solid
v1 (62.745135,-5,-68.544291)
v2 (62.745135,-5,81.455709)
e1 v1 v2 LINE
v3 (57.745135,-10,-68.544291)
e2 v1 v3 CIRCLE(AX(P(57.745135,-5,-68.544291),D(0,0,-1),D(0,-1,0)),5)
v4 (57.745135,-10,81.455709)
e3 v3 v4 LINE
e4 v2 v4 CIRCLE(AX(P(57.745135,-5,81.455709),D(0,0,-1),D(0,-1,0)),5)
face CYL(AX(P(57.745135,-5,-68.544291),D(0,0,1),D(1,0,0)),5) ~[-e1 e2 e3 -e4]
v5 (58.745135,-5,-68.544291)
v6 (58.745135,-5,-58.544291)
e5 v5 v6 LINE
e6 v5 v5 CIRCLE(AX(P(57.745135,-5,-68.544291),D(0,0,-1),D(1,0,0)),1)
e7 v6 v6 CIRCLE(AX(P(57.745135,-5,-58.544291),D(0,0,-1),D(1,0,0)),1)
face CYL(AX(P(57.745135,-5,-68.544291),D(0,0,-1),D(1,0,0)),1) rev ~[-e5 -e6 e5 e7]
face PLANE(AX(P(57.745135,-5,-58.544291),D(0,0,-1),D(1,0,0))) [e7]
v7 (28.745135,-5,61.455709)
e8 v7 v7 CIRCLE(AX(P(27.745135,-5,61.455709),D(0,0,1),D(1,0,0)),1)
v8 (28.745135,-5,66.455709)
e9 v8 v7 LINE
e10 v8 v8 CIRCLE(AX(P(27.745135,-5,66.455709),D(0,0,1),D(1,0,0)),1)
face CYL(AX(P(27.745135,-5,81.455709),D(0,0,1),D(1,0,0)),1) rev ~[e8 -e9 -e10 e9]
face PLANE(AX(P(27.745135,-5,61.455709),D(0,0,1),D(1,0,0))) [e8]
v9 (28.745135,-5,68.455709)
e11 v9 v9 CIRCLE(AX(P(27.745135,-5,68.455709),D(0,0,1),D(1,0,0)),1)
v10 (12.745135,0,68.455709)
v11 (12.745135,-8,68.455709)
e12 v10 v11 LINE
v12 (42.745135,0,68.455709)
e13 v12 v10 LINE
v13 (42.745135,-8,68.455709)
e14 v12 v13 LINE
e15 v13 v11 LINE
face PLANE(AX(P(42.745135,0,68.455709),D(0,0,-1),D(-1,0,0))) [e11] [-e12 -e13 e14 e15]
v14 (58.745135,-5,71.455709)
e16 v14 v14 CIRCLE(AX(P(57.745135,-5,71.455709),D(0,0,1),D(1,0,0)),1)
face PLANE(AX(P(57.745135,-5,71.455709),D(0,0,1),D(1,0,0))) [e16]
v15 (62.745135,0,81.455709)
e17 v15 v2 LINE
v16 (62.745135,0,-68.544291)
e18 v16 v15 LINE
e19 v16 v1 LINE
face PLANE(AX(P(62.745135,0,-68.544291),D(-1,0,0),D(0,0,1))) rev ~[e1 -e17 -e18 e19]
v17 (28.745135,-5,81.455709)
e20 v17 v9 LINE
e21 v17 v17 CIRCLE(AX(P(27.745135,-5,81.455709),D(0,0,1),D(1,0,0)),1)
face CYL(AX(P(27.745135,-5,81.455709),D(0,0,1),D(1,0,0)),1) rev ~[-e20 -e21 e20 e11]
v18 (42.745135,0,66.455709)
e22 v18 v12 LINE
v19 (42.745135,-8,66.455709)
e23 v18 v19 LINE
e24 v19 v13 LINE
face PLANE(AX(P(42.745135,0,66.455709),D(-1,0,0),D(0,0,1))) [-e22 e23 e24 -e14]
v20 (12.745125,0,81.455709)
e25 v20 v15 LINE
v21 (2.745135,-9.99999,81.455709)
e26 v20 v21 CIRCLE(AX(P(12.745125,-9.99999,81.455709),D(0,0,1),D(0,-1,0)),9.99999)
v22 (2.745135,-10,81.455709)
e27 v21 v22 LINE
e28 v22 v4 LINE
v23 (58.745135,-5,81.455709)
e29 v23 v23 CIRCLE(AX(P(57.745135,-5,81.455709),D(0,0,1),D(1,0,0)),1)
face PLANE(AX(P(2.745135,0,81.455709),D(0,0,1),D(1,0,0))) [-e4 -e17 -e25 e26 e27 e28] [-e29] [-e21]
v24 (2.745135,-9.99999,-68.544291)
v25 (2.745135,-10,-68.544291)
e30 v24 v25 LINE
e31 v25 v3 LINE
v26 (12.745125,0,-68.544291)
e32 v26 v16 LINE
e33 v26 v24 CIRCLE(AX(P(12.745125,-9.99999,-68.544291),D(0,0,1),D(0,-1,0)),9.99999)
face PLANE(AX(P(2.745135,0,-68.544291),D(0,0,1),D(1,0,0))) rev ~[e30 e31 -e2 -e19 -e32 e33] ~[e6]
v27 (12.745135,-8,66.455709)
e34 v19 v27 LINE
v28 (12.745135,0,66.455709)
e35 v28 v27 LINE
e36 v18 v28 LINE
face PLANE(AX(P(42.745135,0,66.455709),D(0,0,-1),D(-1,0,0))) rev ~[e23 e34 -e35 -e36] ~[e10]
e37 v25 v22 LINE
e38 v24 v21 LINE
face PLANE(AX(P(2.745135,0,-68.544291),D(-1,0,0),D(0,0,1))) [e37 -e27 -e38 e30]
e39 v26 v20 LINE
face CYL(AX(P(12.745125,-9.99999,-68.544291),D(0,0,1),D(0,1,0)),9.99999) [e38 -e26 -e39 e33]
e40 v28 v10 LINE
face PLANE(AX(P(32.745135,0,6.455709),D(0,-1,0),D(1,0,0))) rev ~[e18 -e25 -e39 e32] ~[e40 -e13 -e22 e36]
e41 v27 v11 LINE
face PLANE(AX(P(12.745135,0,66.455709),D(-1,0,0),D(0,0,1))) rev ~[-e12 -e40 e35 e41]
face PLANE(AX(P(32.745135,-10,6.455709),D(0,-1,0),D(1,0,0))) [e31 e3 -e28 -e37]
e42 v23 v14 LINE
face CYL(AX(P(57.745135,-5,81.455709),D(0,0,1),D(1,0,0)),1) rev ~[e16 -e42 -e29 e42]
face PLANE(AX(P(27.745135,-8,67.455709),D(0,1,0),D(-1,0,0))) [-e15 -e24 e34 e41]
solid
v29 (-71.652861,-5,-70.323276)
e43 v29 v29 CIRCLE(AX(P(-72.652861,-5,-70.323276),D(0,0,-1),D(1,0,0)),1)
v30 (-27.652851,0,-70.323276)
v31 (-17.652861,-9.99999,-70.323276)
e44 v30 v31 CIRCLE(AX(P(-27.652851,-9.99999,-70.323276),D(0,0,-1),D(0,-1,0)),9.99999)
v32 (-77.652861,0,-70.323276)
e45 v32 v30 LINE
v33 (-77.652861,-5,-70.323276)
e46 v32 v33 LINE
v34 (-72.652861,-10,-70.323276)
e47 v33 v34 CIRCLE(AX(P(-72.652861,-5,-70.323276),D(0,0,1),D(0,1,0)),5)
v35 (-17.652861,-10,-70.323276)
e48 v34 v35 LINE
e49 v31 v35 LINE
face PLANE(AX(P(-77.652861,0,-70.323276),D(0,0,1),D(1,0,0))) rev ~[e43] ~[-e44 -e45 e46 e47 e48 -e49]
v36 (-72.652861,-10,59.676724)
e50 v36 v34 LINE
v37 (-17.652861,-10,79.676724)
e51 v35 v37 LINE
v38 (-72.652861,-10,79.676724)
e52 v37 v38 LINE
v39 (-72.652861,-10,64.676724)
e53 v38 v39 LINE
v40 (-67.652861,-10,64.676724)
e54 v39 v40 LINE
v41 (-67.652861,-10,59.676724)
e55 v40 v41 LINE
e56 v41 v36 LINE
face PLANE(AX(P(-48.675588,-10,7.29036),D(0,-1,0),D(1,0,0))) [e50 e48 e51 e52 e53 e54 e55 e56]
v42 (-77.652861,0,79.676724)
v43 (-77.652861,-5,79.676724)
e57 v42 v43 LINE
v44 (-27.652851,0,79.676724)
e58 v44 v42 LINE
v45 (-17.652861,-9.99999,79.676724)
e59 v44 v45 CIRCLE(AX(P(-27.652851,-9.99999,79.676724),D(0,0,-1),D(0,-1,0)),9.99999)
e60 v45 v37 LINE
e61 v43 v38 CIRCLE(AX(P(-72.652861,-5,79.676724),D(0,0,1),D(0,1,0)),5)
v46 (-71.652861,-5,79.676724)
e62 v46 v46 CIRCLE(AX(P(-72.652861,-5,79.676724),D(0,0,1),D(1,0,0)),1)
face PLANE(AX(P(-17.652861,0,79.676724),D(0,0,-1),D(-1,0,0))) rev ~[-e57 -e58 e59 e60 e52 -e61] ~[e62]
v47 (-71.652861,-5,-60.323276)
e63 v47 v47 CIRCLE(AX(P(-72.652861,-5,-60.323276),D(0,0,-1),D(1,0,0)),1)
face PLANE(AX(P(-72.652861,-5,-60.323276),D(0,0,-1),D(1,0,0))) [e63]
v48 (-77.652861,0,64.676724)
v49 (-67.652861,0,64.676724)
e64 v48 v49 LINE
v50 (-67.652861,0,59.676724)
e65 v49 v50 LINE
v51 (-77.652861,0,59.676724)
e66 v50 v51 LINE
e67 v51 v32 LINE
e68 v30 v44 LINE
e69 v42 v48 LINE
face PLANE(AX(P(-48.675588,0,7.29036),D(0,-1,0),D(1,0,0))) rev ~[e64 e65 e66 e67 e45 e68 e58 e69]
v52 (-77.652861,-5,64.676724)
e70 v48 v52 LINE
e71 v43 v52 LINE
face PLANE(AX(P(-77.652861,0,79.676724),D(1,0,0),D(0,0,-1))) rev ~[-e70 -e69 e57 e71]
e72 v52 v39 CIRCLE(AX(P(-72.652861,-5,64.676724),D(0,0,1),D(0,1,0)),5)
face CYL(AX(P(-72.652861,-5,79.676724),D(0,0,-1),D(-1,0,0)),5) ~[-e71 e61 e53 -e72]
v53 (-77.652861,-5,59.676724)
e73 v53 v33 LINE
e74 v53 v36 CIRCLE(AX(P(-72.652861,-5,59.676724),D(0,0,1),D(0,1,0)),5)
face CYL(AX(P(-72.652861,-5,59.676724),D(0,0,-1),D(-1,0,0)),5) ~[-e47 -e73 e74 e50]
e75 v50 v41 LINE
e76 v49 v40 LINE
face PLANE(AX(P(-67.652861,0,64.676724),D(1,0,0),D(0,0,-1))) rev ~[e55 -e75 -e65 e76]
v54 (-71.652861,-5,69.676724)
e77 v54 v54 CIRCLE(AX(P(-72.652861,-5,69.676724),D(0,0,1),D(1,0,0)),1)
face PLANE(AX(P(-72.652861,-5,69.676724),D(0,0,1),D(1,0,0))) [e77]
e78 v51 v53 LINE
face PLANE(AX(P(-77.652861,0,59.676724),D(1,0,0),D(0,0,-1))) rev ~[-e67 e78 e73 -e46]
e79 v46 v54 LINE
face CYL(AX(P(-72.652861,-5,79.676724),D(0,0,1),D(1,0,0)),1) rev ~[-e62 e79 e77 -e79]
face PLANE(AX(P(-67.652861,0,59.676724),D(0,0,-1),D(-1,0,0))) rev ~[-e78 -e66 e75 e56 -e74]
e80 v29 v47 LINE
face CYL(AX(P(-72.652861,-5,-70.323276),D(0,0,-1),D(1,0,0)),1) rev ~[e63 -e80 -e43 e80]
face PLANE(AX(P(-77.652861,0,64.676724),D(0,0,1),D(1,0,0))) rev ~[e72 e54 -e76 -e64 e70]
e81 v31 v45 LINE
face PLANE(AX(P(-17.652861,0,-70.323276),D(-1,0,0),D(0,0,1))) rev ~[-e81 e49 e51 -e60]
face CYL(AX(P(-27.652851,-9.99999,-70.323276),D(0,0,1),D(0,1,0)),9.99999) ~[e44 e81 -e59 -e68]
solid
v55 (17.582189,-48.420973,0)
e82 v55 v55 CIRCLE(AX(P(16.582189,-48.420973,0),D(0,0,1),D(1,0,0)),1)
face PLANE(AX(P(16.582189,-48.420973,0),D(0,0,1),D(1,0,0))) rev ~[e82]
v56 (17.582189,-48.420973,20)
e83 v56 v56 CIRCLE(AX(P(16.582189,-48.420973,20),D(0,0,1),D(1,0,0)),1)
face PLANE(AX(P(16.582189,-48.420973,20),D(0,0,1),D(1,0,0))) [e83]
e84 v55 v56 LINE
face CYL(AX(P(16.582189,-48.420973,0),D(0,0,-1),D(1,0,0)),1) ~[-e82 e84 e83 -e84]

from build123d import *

# Parameters (mm, degrees)
F1_DEPTH  = 10
F0_W      = 60
F0_H      = 150
F2_R      = 5
F2_2_R    = 5
F4_R      = 9.99999
F4_2_R    = 9.99999
F3_W      = 30
F3_H      = 2
F5_DEPTH  = 8
F6_R      = 1
F7_DEPTH  = 20
F8_R      = 1
F9_DEPTH  = 10
F10_R     = 1
F11_DEPTH = 10
F12_R     = 1
F13_DEPTH = 10
F14_R     = 1
F15_DEPTH = 10
F16_R     = 1
F17_DEPTH = 20


# Not quite as in the source:
# - a fillet or chamfer is up to 0.001 mm smaller than in the source, because OpenCascade refuses the exact size


with BuildPart() as f1:
    # F0 (on Front) → F1 (new body)
    with BuildSketch(Plane.XZ):
        Polygon((-17.6528605427, 79.6767238528), (-77.6528605427, 79.6767238528), (-77.6528605427, 64.6767238528), (-67.6528605427, 64.6767238528), (-67.6528605427, 59.6767238528), (-77.6528605427, 59.6767238528), (-77.6528605427, -70.3232761472), (-17.6528605427, -70.3232761472), align=None)
    extrude(amount=F1_DEPTH)

    # F2
    f2_edges = [f1.edges().sort_by_distance(p)[0] for p in [
        (-77.652861, -10, 72.176724),
        (-77.652861, -10, -5.323276),
    ]]
    fillet(f2_edges, radius=F2_R)

    # F4#2 (radius 10 in the source; OpenCascade refuses exactly that, so slightly less here)
    f4_2_edges = [f1.edges().sort_by_distance(p)[0] for p in [
        (-17.652861, 0, 4.676724),
    ]]
    fillet(f4_2_edges, radius=F4_2_R)

    # F8 (on face) → F9 (cut)
    with BuildSketch(Plane(origin=(0, 0, -70.3232761472), x_dir=(1, 0, 0), z_dir=(0, 0, -1))):
        with Locations((-72.6528605427, 5)):
            Circle(F8_R)
    extrude(amount=-F9_DEPTH, mode=Mode.SUBTRACT)

    # F12 (on face) → F13 (cut)
    with BuildSketch(Plane.XY.offset(79.6767238528)):
        with Locations((-72.6528605427, -5)):
            Circle(F12_R)
    extrude(amount=-F13_DEPTH, mode=Mode.SUBTRACT)


with BuildPart() as f1b:
    # F0 (on Front) → F1, piece 2 (new body)
    with BuildSketch(Plane.XZ):
        with Locations((32.7451354545, 6.4557090402)):
            Rectangle(F0_W, F0_H)
    extrude(amount=F1_DEPTH)

    # F2#2
    f2_2_edges = [f1b.edges().sort_by_distance(p)[0] for p in [
        (62.745135, -10, 6.455709),
    ]]
    fillet(f2_2_edges, radius=F2_2_R)

    # F4 (radius 10 in the source; OpenCascade refuses exactly that, so slightly less here)
    f4_edges = [f1b.edges().sort_by_distance(p)[0] for p in [
        (2.745135, 0, 6.455709),
    ]]
    fillet(f4_edges, radius=F4_R)

    # F3 (on face) → F5 (cut)
    with BuildSketch(Plane(origin=(0, 0, 0), x_dir=(-1, 0, 0), z_dir=(0, 1, 0))):
        with Locations((-27.7451354545, 67.4557090402)):
            Rectangle(F3_W, F3_H)
    extrude(amount=-F5_DEPTH, mode=Mode.SUBTRACT)

    # F6 (on face) → F7 (cut)
    with BuildSketch(Plane.XY.offset(81.4557090402)):
        with Locations((27.7451354545, -5)):
            Circle(F6_R)
    extrude(amount=-F7_DEPTH, mode=Mode.SUBTRACT)

    # F10 (on face) → F11 (cut)
    with BuildSketch(Plane(origin=(0, 0, -68.5442909598), x_dir=(1, 0, 0), z_dir=(0, 0, -1))):
        with Locations((57.7451354545, 5)):
            Circle(F10_R)
    extrude(amount=-F11_DEPTH, mode=Mode.SUBTRACT)

    # F14 (on face) → F15 (cut)
    with BuildSketch(Plane.XY.offset(81.4557090402)):
        with Locations((57.7451354545, -5)):
            Circle(F14_R)
    extrude(amount=-F15_DEPTH, mode=Mode.SUBTRACT)


with BuildPart() as f17:
    # F16 (on Top) → F17 (new body)
    with BuildSketch(Plane.XY):
        with Locations((16.5821891278, -48.4209731221)):
            Circle(F16_R)
    extrude(amount=F17_DEPTH)


solid = Compound([f1.part, f1b.part, f17.part])
